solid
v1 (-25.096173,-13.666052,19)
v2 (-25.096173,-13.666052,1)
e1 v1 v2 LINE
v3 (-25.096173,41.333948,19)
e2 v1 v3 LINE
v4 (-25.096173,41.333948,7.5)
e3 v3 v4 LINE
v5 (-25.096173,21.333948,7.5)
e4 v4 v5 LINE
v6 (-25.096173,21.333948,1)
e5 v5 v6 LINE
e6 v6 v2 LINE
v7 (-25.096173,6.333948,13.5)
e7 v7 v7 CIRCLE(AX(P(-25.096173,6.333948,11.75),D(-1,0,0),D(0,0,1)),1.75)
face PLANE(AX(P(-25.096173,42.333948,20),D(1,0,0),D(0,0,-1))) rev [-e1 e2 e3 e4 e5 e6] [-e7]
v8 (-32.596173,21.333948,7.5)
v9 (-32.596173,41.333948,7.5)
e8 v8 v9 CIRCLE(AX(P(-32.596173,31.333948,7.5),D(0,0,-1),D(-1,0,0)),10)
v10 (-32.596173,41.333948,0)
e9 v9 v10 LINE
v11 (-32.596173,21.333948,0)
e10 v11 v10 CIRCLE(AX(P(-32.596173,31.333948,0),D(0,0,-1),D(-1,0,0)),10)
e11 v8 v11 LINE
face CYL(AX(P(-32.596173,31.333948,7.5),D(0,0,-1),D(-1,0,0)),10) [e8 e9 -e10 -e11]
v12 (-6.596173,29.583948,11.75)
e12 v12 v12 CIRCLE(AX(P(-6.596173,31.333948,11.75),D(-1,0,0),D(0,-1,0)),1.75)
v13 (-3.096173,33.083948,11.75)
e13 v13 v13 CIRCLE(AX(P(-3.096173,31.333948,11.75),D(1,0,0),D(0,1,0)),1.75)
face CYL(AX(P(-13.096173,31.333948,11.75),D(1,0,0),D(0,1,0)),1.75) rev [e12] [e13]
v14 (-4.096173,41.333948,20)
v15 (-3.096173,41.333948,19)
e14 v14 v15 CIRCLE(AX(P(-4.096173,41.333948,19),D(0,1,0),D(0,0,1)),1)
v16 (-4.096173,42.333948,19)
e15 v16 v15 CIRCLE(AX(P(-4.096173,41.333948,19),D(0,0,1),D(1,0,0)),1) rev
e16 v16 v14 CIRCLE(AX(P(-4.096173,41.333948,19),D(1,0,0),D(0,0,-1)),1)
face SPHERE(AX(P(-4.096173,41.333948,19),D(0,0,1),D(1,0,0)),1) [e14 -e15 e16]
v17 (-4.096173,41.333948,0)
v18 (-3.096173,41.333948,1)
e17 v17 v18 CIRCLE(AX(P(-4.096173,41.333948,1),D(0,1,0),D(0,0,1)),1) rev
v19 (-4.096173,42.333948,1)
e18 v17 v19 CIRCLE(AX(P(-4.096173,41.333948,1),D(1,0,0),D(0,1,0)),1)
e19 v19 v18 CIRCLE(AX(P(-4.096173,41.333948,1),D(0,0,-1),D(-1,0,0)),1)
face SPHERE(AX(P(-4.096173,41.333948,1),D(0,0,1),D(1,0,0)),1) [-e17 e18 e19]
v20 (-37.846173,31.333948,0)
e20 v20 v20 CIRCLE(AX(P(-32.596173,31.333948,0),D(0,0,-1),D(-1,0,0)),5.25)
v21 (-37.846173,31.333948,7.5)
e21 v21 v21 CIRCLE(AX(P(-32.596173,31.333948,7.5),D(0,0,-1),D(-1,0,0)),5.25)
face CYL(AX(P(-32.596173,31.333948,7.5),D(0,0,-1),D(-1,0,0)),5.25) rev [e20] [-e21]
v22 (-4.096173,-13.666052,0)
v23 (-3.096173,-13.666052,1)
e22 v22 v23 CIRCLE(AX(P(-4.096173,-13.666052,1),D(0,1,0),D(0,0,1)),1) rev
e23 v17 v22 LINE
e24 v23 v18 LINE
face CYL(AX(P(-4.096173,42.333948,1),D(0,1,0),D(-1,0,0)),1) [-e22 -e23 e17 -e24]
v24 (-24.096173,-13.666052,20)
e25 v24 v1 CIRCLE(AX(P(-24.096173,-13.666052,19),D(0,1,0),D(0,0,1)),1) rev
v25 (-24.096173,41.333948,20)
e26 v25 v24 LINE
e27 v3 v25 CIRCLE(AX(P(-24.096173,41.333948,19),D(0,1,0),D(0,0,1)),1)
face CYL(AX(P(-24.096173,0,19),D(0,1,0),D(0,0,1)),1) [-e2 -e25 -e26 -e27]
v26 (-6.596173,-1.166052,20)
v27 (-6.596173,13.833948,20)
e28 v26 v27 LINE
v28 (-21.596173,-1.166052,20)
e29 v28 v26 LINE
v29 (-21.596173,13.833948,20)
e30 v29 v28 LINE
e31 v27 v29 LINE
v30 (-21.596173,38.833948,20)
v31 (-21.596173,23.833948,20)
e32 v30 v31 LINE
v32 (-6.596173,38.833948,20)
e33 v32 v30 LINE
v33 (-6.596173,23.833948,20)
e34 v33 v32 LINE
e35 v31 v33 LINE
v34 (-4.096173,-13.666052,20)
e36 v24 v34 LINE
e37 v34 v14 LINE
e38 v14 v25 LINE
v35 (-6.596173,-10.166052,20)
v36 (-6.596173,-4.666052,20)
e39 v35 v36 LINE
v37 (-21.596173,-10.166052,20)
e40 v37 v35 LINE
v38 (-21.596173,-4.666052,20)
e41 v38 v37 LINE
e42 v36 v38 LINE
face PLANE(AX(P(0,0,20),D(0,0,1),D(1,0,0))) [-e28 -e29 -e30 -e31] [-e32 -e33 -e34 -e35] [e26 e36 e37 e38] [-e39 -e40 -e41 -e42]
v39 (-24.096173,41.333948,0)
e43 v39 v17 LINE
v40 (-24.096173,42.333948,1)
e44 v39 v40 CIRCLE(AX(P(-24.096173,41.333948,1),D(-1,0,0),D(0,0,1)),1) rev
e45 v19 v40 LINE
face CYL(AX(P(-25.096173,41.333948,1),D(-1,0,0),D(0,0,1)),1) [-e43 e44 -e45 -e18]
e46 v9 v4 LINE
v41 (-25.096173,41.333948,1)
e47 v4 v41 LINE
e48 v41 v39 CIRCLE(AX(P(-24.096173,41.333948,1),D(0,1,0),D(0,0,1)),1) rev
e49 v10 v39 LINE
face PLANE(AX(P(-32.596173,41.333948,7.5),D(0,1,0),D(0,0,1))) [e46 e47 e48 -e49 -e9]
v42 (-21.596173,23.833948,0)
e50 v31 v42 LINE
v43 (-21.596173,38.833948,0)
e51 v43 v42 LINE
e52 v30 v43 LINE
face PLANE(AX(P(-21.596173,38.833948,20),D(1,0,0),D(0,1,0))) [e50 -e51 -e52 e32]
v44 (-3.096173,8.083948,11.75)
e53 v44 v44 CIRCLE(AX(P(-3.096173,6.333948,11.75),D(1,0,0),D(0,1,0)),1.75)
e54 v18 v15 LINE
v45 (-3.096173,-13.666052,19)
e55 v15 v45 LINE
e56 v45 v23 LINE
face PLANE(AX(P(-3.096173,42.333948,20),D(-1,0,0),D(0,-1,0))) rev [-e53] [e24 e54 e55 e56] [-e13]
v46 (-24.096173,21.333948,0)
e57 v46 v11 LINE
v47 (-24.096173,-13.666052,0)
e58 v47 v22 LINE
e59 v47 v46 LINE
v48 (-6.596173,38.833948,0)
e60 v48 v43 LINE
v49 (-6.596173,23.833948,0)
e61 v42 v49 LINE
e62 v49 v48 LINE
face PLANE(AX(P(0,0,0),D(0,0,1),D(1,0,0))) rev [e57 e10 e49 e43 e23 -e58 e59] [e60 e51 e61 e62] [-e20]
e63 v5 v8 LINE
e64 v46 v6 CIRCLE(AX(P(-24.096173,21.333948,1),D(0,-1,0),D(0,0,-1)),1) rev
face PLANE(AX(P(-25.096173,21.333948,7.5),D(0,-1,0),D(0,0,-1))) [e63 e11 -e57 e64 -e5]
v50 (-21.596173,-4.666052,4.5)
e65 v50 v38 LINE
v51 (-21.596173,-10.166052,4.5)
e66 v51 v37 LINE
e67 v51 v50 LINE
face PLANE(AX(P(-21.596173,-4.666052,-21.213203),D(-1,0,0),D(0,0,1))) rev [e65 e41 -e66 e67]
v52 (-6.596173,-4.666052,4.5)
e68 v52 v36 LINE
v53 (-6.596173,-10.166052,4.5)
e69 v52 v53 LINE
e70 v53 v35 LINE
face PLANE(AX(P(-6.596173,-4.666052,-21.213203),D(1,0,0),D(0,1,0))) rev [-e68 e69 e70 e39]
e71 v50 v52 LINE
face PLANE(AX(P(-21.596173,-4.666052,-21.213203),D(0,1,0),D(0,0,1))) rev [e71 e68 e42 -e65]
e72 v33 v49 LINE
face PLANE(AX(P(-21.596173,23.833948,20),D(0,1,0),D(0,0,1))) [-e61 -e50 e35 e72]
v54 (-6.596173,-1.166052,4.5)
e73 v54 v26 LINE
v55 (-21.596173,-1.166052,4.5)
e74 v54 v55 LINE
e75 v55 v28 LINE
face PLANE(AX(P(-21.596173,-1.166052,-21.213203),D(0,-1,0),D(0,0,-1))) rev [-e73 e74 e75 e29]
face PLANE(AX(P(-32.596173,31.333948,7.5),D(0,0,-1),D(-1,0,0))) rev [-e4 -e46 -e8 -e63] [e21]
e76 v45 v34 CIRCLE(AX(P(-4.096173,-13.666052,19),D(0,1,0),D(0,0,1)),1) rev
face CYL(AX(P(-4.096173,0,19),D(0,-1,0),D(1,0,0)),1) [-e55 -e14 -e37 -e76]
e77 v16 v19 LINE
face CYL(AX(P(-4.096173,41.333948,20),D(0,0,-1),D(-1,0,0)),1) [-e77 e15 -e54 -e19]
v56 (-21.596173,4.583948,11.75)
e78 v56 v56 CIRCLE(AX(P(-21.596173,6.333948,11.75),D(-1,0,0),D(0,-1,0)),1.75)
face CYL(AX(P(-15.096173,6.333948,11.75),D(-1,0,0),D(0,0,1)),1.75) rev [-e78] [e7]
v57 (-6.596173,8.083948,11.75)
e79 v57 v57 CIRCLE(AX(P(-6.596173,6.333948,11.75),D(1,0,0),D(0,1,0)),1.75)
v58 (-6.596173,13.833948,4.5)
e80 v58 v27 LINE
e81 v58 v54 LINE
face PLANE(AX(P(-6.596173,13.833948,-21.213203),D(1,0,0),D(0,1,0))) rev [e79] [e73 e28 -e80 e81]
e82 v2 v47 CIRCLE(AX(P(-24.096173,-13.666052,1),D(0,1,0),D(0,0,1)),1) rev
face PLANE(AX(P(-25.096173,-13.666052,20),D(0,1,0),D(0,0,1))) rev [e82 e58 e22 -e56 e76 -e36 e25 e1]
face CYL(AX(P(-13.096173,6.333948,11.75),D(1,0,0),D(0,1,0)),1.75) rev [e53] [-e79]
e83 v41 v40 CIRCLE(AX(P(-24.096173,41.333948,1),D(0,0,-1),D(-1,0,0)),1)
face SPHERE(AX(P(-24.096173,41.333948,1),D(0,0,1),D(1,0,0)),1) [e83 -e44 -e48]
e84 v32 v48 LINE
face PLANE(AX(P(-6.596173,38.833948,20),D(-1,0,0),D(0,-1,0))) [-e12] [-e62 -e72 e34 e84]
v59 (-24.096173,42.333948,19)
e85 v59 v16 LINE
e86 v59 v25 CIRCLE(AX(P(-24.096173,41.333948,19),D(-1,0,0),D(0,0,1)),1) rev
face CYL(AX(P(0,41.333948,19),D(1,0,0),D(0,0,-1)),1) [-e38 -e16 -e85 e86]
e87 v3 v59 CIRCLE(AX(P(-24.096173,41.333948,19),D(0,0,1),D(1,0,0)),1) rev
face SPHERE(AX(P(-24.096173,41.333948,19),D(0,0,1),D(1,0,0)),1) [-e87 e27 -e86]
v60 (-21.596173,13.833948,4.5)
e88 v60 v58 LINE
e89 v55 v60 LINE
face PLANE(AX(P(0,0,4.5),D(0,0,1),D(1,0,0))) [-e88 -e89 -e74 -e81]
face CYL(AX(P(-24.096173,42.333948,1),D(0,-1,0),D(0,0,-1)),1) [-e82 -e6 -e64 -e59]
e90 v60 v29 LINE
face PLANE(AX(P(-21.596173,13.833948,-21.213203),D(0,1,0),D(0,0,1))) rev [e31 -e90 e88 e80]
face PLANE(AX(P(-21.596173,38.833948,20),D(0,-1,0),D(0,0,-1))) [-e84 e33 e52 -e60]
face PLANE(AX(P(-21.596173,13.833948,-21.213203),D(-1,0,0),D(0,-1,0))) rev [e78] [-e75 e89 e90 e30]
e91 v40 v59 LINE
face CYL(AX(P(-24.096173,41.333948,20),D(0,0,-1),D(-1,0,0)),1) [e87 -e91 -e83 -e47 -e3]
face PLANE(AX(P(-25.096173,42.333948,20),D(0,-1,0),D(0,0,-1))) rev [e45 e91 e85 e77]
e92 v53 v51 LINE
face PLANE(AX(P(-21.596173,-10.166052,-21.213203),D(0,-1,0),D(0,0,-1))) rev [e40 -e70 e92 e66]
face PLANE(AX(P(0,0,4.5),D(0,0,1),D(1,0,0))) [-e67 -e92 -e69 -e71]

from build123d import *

# Parameters (mm, degrees)
SKETCH1_W           = 22
SKETCH1_H           = 56
SKETCH1_W_2         = 15
SKETCH1_H_2         = 15
BOSS_EXTRUDE1_DEPTH = 20
SKETCH2_W           = 15
SKETCH2_H           = 15
SKETCH2_H_2         = 5.5
CUT_EXTRUDE1_DEPTH  = 15.5
SKETCH4_R           = 5.25
BOSS_EXTRUDE3_DEPTH = 7.5
FILLET4_R           = 1
SKETCH5_R           = 1.75
CUT_EXTRUDE2_DEPTH  = 10
CUT_EXTRUDE3_START  = -10
SKETCH6_R           = 1.75
CUT_EXTRUDE3_DEPTH  = 10


with BuildPart() as part:
    # Sketch1 → Boss-Extrude1 (new body)
    with BuildSketch(Plane.XY):
        with Locations((-14.096172604, 14.333947726)):
            Rectangle(SKETCH1_W, SKETCH1_H)
        with Locations((-14.096172604, 31.333947726)):
            Rectangle(SKETCH1_W_2, SKETCH1_H_2, mode=Mode.SUBTRACT)
    extrude(amount=BOSS_EXTRUDE1_DEPTH)

    # Sketch2 → Cut-Extrude1 (cut)
    with BuildSketch(Plane.XY.offset(20)):
        with Locations((-14.096172604, 6.333947726)):
            Rectangle(SKETCH2_W, SKETCH2_H)
        with Locations((-14.096172604, -7.416052274)):
            Rectangle(SKETCH2_W, SKETCH2_H_2)
    extrude(amount=-CUT_EXTRUDE1_DEPTH, mode=Mode.SUBTRACT)

    # Sketch4 → Boss-Extrude3 (add)
    with BuildSketch(Plane(origin=(0, 0, 0), x_dir=(-1, 0, 0), z_dir=(0, 0, -1))):
        with BuildLine():
            Line((32.596172604, 41.333947726), (25.096172604, 41.333947726))
            Line((25.096172604, 41.333947726), (25.096172604, 21.333947726))
            Line((25.096172604, 21.333947726), (32.596172604, 21.333947726))
            ThreePointArc((32.596172604, 21.333947726), (42.596172604, 31.333947726), (32.596172604, 41.333947726))
        make_face()
        with Locations((32.596172604, 31.333947726)):
            Circle(SKETCH4_R, mode=Mode.SUBTRACT)
    extrude(amount=-BOSS_EXTRUDE3_DEPTH)

    # Fillet4
    fillet4_edges = [part.edges().sort_by_distance(p)[0] for p in [
        (-3.096172604, 14.333947726, 20),
        (-14.096172604, 42.333947726, 20),
        (-25.096172604, 14.333947726, 20),
        (-14.096172604, 42.333947726, 0),
        (-3.096172604, 14.333947726, 0),
        (-25.096172604, 3.833947726, 0),
        (-25.096172604, 41.833947726, 0),
        (-25.096172604, 42.333947726, 10),
        (-3.096172604, 42.333947726, 10),
    ]]
    fillet(fillet4_edges, radius=FILLET4_R - 0.0001)  # a hair under: the kernel refuses the full size

    # Sketch5 → Cut-Extrude2 (cut)
    with BuildSketch(Plane(origin=(-3.096172604, 0, 0), x_dir=(0, 0, -1), z_dir=(1, 0, 0))):
        with Locations(Location((-11.75, 31.333947726, 0), (0, 0, 90))):
            Circle(SKETCH5_R)
        with Locations(Location((-11.75, 6.333947726, 0), (0, 0, 90))):
            Circle(SKETCH5_R)
    extrude(amount=-CUT_EXTRUDE2_DEPTH, mode=Mode.SUBTRACT)

    # Sketch6 → Cut-Extrude3 (cut)
    with BuildSketch(Plane.ZY.offset(25.096172604).offset(CUT_EXTRUDE3_START)):
        with Locations(Location((11.75, 6.333947726, 0), (0, 0, 90))):
            Circle(SKETCH6_R)
    extrude(amount=CUT_EXTRUDE3_DEPTH, mode=Mode.SUBTRACT)


solid = part.part
